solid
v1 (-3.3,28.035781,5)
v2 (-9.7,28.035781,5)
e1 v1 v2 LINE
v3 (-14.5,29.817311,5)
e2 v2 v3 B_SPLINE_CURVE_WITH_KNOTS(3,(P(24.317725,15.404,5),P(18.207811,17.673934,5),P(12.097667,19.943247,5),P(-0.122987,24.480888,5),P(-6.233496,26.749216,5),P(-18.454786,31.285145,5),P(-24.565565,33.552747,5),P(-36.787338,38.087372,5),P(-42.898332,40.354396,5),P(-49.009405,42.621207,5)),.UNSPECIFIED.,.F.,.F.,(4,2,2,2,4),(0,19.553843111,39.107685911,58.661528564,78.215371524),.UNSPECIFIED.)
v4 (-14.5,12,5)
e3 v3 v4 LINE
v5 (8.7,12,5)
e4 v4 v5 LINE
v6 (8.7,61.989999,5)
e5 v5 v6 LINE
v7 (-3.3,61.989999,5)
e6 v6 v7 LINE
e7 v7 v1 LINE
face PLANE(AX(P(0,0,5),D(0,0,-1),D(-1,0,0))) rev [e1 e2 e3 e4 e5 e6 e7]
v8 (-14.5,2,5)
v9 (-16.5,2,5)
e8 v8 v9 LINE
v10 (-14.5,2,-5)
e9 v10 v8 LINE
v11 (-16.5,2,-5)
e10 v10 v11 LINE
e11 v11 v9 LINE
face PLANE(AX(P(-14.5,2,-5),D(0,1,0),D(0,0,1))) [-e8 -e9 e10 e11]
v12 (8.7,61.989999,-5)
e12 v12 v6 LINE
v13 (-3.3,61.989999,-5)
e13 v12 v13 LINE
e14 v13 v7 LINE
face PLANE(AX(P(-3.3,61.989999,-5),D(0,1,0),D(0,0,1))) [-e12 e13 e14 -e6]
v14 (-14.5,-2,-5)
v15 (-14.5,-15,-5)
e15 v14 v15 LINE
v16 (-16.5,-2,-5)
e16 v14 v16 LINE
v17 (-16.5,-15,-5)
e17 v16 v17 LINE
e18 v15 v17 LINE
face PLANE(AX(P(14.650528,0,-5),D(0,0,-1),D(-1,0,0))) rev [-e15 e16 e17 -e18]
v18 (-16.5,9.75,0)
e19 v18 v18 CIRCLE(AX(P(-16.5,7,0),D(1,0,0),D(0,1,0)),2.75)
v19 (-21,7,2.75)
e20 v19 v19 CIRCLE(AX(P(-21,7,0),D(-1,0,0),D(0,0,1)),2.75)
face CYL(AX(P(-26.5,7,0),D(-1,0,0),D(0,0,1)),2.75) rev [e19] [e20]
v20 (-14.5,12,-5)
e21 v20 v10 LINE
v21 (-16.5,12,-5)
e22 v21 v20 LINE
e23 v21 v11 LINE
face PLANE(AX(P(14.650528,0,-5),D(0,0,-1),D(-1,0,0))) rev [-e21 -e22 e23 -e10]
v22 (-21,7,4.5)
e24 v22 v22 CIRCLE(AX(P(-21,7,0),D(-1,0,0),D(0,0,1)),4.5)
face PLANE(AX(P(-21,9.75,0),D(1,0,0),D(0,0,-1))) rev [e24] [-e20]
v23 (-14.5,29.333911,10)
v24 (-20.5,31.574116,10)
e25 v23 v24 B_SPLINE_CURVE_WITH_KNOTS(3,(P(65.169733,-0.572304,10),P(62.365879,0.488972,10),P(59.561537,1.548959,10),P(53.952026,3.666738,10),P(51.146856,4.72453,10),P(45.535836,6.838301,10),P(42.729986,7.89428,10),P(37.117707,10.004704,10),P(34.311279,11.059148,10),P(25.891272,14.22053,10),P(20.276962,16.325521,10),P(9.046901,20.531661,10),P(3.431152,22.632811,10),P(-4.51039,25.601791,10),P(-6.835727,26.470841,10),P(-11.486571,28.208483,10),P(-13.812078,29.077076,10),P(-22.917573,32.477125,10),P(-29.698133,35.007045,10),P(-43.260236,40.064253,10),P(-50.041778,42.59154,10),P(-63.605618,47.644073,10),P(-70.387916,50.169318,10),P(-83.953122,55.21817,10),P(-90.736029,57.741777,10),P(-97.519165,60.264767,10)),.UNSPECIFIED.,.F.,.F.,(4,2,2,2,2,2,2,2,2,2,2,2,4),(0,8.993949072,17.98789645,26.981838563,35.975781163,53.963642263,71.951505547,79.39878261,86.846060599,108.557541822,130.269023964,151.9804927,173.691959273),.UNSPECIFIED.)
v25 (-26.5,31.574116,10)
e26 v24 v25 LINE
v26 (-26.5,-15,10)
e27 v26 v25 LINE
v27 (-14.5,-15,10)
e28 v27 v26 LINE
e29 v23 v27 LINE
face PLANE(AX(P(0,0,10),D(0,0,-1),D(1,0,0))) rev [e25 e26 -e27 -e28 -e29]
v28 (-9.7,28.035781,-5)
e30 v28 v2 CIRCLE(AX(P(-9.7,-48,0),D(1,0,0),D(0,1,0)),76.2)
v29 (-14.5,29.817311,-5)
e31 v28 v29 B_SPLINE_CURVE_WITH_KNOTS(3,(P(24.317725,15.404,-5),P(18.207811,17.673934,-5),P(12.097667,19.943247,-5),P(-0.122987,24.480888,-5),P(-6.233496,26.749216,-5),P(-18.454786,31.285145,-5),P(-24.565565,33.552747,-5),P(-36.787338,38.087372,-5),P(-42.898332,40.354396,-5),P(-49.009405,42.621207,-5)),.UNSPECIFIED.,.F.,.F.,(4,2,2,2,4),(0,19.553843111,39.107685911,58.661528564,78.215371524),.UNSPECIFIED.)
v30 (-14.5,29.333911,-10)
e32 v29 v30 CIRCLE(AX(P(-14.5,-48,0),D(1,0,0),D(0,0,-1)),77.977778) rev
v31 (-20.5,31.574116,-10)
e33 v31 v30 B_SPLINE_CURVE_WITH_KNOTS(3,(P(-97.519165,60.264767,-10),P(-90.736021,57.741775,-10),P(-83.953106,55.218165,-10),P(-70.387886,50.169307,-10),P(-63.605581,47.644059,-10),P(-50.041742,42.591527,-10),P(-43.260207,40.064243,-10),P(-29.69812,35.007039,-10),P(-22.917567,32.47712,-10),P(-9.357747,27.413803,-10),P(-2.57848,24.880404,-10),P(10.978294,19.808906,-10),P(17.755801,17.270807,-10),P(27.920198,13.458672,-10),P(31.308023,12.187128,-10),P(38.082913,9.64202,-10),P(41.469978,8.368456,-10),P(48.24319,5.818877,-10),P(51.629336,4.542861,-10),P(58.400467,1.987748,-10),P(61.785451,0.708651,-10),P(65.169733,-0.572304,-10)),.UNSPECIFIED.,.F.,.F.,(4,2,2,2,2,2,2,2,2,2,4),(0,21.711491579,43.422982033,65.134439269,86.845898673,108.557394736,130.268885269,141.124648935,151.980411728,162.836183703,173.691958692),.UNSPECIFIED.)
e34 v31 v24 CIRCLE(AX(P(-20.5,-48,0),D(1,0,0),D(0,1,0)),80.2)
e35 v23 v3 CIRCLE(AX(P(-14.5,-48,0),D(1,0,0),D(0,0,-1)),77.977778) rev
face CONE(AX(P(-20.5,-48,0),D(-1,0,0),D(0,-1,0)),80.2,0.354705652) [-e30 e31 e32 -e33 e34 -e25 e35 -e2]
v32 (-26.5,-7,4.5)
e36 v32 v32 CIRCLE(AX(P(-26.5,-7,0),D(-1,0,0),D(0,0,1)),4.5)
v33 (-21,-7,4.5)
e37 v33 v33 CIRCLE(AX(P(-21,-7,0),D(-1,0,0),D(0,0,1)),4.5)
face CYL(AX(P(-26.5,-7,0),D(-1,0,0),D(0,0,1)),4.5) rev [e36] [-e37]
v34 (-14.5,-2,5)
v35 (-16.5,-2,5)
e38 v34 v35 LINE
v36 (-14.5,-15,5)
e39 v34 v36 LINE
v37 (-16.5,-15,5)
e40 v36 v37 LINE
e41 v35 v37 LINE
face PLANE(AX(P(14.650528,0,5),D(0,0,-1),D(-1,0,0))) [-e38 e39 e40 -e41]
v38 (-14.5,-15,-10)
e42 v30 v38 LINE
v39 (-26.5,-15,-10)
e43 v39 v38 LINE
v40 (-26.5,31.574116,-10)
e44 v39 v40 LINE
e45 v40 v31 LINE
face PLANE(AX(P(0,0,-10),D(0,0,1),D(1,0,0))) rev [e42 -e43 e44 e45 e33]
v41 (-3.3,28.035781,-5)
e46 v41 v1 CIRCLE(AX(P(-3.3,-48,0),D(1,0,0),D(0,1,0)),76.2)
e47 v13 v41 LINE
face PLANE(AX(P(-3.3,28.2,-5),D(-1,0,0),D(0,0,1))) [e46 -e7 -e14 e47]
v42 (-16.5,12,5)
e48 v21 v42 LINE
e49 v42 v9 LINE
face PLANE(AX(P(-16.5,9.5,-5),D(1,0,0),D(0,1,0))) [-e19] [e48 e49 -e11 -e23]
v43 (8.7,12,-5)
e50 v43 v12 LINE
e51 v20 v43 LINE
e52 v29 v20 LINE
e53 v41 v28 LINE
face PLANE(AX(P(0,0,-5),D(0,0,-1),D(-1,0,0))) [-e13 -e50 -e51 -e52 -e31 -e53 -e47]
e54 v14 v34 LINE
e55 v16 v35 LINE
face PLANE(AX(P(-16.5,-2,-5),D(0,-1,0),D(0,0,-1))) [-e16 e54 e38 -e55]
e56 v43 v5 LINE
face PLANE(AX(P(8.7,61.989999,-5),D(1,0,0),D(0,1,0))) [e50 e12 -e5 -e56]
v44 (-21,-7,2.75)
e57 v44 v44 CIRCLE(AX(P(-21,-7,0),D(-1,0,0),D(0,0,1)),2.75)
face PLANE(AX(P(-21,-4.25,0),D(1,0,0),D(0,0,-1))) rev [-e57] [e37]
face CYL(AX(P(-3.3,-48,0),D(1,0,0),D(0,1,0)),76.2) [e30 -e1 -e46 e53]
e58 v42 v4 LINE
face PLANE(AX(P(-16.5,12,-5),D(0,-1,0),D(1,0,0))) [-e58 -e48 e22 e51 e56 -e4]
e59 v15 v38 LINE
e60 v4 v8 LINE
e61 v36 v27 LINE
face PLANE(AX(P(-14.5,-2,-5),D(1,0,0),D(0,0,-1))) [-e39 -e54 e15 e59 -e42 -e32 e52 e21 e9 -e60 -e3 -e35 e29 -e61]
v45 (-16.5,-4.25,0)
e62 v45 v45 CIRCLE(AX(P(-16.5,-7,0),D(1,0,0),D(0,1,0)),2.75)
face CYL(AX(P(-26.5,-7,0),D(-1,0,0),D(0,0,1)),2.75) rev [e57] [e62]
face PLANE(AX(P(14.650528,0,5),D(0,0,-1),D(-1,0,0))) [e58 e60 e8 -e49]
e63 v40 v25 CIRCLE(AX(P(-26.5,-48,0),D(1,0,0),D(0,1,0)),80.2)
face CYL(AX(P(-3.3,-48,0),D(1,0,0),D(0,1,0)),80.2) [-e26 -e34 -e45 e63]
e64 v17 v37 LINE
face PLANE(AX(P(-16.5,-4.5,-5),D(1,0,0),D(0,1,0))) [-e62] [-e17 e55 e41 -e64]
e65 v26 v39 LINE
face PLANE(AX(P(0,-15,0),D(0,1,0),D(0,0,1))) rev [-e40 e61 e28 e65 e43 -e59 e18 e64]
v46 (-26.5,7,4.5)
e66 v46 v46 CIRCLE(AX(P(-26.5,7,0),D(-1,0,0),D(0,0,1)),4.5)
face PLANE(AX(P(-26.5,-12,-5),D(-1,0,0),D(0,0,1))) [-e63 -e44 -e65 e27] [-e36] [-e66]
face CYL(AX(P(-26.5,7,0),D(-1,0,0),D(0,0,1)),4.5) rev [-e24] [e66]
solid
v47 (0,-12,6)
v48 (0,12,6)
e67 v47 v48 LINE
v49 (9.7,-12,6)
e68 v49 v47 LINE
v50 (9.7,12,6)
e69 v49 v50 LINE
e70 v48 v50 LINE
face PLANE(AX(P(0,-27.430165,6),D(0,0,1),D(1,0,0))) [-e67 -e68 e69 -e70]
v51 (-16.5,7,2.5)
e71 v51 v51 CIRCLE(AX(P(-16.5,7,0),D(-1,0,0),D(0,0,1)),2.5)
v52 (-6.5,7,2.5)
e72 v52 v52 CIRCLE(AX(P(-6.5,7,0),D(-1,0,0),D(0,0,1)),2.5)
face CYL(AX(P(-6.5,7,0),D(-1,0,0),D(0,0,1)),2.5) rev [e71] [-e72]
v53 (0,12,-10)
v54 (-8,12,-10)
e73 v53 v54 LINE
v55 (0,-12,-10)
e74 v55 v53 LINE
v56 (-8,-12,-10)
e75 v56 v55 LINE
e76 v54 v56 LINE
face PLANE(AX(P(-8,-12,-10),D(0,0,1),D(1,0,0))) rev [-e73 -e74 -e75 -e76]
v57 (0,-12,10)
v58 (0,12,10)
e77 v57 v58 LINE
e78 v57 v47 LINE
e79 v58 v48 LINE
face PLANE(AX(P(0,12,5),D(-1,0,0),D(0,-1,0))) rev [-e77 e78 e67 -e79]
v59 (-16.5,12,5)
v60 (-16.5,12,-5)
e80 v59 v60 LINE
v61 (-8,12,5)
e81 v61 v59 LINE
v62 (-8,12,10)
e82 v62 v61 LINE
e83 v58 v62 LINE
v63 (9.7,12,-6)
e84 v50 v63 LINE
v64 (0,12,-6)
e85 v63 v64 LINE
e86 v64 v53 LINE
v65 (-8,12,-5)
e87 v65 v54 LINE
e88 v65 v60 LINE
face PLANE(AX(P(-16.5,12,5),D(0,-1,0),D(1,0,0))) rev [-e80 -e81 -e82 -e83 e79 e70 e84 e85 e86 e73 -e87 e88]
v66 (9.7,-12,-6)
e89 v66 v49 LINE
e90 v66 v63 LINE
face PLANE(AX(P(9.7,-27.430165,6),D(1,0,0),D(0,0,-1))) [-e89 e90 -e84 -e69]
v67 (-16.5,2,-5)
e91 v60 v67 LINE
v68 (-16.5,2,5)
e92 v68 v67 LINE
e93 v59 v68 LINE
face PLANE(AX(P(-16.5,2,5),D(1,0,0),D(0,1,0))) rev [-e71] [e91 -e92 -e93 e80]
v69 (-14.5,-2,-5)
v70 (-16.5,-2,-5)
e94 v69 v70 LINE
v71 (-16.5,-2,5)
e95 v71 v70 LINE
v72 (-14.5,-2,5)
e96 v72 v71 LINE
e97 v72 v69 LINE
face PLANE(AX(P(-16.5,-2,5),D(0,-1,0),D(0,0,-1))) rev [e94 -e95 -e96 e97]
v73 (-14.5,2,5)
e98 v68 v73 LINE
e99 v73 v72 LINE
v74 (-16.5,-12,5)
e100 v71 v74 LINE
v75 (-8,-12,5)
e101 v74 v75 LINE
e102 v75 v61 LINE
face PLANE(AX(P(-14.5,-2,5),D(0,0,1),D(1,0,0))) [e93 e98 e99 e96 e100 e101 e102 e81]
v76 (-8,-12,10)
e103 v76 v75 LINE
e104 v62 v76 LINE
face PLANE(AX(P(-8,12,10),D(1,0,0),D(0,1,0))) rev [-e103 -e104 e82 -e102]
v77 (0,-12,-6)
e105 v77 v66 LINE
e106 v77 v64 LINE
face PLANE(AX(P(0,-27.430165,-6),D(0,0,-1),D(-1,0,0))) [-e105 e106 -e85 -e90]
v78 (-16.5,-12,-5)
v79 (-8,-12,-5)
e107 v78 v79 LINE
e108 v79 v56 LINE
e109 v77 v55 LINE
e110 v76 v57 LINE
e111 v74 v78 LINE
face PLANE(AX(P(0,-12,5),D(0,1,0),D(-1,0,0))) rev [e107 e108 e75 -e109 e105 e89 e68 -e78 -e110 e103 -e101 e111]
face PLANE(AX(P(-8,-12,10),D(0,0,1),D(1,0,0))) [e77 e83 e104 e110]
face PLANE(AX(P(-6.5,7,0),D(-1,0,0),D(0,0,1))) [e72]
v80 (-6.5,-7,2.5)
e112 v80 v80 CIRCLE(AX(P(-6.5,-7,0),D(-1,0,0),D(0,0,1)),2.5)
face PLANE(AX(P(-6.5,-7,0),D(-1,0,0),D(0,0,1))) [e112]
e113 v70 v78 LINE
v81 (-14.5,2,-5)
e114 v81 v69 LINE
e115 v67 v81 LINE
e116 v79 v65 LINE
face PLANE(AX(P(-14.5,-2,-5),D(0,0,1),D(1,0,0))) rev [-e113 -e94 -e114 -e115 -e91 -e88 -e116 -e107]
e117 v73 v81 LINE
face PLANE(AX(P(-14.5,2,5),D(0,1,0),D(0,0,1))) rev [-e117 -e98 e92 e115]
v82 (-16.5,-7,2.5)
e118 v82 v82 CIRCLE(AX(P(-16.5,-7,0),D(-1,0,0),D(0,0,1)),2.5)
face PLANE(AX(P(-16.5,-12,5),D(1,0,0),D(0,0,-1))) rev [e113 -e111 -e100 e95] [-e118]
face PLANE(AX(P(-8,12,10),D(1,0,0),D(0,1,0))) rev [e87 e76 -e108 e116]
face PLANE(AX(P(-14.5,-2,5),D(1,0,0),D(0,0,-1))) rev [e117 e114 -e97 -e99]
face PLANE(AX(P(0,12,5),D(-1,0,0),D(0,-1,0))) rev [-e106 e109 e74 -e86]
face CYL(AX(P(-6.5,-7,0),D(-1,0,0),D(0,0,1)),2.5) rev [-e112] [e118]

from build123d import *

# Parameters (mm, degrees)
MHSL3_50D_MHSL_FINGER_START       = -14.5
MHSL3_50D_MHSL_FINGER_OUTLINE_W   = 24
MHSL3_50D_MHSL_FINGER_OUTLINE_H   = 10
MHSL3_50D_MHSL_FINGER_OUTLINE_R   = 2.5
MHSL3_50D_MHSL_FINGER_DEPTH       = 24.2
MHSL3_50D_MHSL_FINGER_START_2     = -8
MHSL3_50D_MHSL_FINGER_2_OUTLINE_W = 24
MHSL3_50D_MHSL_FINGER_2_OUTLINE_H = 5
MHSL3_50D_MHSL_FINGER_2_DEPTH     = 8
MHSL3_50D_MHSL_FINGER_START_3     = -6.5
MHSL3_50D_MHSL_FINGER_3_OUTLINE_W = 24
MHSL3_50D_MHSL_FINGER_3_OUTLINE_H = 1
MHSL3_50D_MHSL_FINGER_3_OUTLINE_R = 2.5
MHSL3_50D_MHSL_FINGER_3_DEPTH     = 16.2
MHSL3_50D_MHSL_FINGER_START_4     = -16.5
MHSL3_50D_MHSL_FINGER_4_OUTLINE_W = 10
MHSL3_50D_MHSL_FINGER_4_OUTLINE_H = 10
MHSL3_50D_MHSL_FINGER_4_OUTLINE_R = 2.5
MHSL3_50D_MHSL_FINGER_4_DEPTH     = 2
BOSS_EXTRUDE2_DEPTH               = 5
BOSS_EXTRUDE2_DEPTH_BACK          = 5
CBORE_FOR_M5_SHCS5_AT_2_COUNT     = 2
CBORE_FOR_M5_SHCS5_AT_2_PITCH     = 14
BOSS_EXTRUDE3_DEPTH               = 10
BOSS_EXTRUDE4_DEPTH               = 5
SKETCH18_W                        = 10
SKETCH18_H                        = 20
BOSS_EXTRUDE5_DEPTH               = 3
SKETCH21_W                        = 5
SKETCH21_H                        = 13
BOSS_EXTRUDE7_DEPTH               = 2


# Read off the part's stored shape, not the designer's step: MHSL3-50D_MHSL-Finger
with BuildPart() as part:
    # MHSL3-50D_MHSL-Finger outline → MHSL3-50D_MHSL-Finger (new body)
    with BuildSketch(Plane.YZ.offset(MHSL3_50D_MHSL_FINGER_START)):
        Rectangle(MHSL3_50D_MHSL_FINGER_OUTLINE_W, MHSL3_50D_MHSL_FINGER_OUTLINE_H)
        with Locations((7, 0)):
            Circle(MHSL3_50D_MHSL_FINGER_OUTLINE_R, mode=Mode.SUBTRACT)
        with Locations((-7, 0)):
            Circle(MHSL3_50D_MHSL_FINGER_OUTLINE_R, mode=Mode.SUBTRACT)
    extrude(amount=MHSL3_50D_MHSL_FINGER_DEPTH)



with BuildPart() as body_2:
    # MHSL3-50D_MHSL-Finger 2 outline → MHSL3-50D_MHSL-Finger 2 (new body)
    with BuildSketch(Plane.YZ.offset(MHSL3_50D_MHSL_FINGER_START_2)):
        with Locations((0, 7.5)):
            Rectangle(MHSL3_50D_MHSL_FINGER_2_OUTLINE_W, MHSL3_50D_MHSL_FINGER_2_OUTLINE_H)
        with Locations((0, -7.5)):
            Rectangle(MHSL3_50D_MHSL_FINGER_2_OUTLINE_W, MHSL3_50D_MHSL_FINGER_2_OUTLINE_H)
    extrude(amount=MHSL3_50D_MHSL_FINGER_2_DEPTH)


with BuildPart() as part_1:
    add(part.part)

    add(body_2.part)  # MHSL3-50D_MHSL-Finger 3 merges body 2
    # MHSL3-50D_MHSL-Finger 3 outline → MHSL3-50D_MHSL-Finger 3 (add)
    with BuildSketch(Plane.YZ.offset(MHSL3_50D_MHSL_FINGER_START_3)):
        with Locations((0, 5.5)):
            Rectangle(MHSL3_50D_MHSL_FINGER_3_OUTLINE_W, MHSL3_50D_MHSL_FINGER_3_OUTLINE_H)
        with Locations((0, -5.5)):
            Rectangle(MHSL3_50D_MHSL_FINGER_3_OUTLINE_W, MHSL3_50D_MHSL_FINGER_3_OUTLINE_H)
        with Locations((7, 0)):
            Circle(MHSL3_50D_MHSL_FINGER_3_OUTLINE_R)
        with Locations((-7, 0)):
            Circle(MHSL3_50D_MHSL_FINGER_3_OUTLINE_R)
    extrude(amount=MHSL3_50D_MHSL_FINGER_3_DEPTH)

    # MHSL3-50D_MHSL-Finger 4 outline → MHSL3-50D_MHSL-Finger 4 (add)
    # profile 1 of 2: a face of its own
    with BuildSketch(Plane.YZ.offset(MHSL3_50D_MHSL_FINGER_START_4)):
        with Locations((7, 0)):
            Rectangle(MHSL3_50D_MHSL_FINGER_4_OUTLINE_W, MHSL3_50D_MHSL_FINGER_4_OUTLINE_H)
        with Locations((7, 0)):
            Circle(MHSL3_50D_MHSL_FINGER_4_OUTLINE_R, mode=Mode.SUBTRACT)
    # profile 2 of 2: a face of its own
    with BuildSketch(Plane.YZ.offset(MHSL3_50D_MHSL_FINGER_START_4)):
        with Locations((-7, 0)):
            Rectangle(MHSL3_50D_MHSL_FINGER_4_OUTLINE_W, MHSL3_50D_MHSL_FINGER_4_OUTLINE_H)
        with Locations((-7, 0)):
            Circle(MHSL3_50D_MHSL_FINGER_4_OUTLINE_R, mode=Mode.SUBTRACT)
    extrude(amount=MHSL3_50D_MHSL_FINGER_4_DEPTH)


with BuildPart() as body_2_2:
    # Sketch2 → Boss-Extrude2 (new, two sides: drawn at the far end of the back side and taken through both)
    with BuildSketch(Plane.XY.offset(-BOSS_EXTRUDE2_DEPTH_BACK)):
        Polygon((-16.5, -4.5), (-16.5, -2), (-14.5, -2), (-14.5, 2), (-16.5, 2), (-16.5, 4.5), (-16.5, 9.5), (-16.5, 12), (8.7, 12), (8.7, 61.989999), (-3.3, 61.989999), (-3.3, 28.2), (-26.5, 28.2), (-26.5, -12), (-16.5, -12), (-16.5, -9.5), align=None)
    extrude(amount=BOSS_EXTRUDE2_DEPTH + BOSS_EXTRUDE2_DEPTH_BACK)

    # Sketch14 → CBORE for M5 SHCS5 (revolve, cut)
    with BuildSketch(Plane(origin=(-26.5, 7, 0), x_dir=(0, 0, 1), z_dir=(0, 1, 0))):
        Polygon((0, 0), (0, 36.2), (2.75, 36.2), (2.75, 5.5), (4.5, 5.5), (4.5, 0), align=None)
    cbore_for_m5_shcs5 = revolve(axis=Axis((-32.85, 7, 0), (1, 0, 0)), mode=Mode.SUBTRACT)

    # CBORE for M5 SHCS5 at 2: CBORE for M5 SHCS5 ×2
    with Locations(*[(0, -i * CBORE_FOR_M5_SHCS5_AT_2_PITCH, 0) for i in range(1, CBORE_FOR_M5_SHCS5_AT_2_COUNT)]):
        add(cbore_for_m5_shcs5, mode=Mode.SUBTRACT)

    # Sketch15 → Boss-Extrude3 (add)
    with BuildSketch(Plane(origin=(0, 0, -5), x_dir=(-1, 0, 0), z_dir=(0, 0, -1))):
        Polygon((26.5, 28.2), (26.5, 32.2), (20.5, 32.2), (9.7, 28.2), align=None)
    extrude(amount=-BOSS_EXTRUDE3_DEPTH)

    # Sketch16 → Boss-Extrude4 (add)
    with BuildSketch(Plane(origin=(0, 0, -5), x_dir=(-1, 0, 0), z_dir=(0, 0, -1))):
        Polygon((26.5, -12), (16.5, -12), (16.5, -2), (14.5, -2), (14.5, 2), (16.5, 2), (16.5, 12), (16.5, 30.718518519), (20.5, 32.2), (26.5, 32.2), align=None)
    boss_extrude4 = extrude(amount=BOSS_EXTRUDE4_DEPTH)

    # Mirror1: Boss-Extrude4 across plane
    add(boss_extrude4.mirror(Plane.XY))

    # Sketch18 → Boss-Extrude5 (add)
    with BuildSketch(Plane.XZ.offset(12)):
        with Locations((-21.5, 0)):
            Rectangle(SKETCH18_W, SKETCH18_H)
    extrude(amount=BOSS_EXTRUDE5_DEPTH)

    # Sketch21 → Boss-Extrude7 (add)
    with BuildSketch(Plane(origin=(-16.5, 0, 0), x_dir=(0, 0, -1), z_dir=(1, 0, 0))):
        Polygon((-5, 30.718518519), (-10, 30.718518519), (-10, 2), (-5, 2), (-5, 12), align=None)
        Polygon((5, 12), (5, 2), (10, 2), (10, 30.718518519), (5, 30.718518519), align=None)
        with Locations((7.5, -8.5)):
            Rectangle(SKETCH21_W, SKETCH21_H)
        with Locations((-7.5, -8.5)):
            Rectangle(SKETCH21_W, SKETCH21_H)
    extrude(amount=BOSS_EXTRUDE7_DEPTH)

    # Sketch17 → Cut-Revolve1 (revolve, cut)
    with BuildSketch(Plane.XY):
        Polygon((-9.7, 28.2), (-20.5, 32.2), (-26.5, 32.2), (-26.5, 48.976180053), (-3.3, 48.976180053), (-3.3, 28.2), align=None)
    revolve(axis=Axis((-3.3, -48, 0), (-1, 0, 0)), mode=Mode.SUBTRACT)


solid = Compound([part_1.part, body_2_2.part])
